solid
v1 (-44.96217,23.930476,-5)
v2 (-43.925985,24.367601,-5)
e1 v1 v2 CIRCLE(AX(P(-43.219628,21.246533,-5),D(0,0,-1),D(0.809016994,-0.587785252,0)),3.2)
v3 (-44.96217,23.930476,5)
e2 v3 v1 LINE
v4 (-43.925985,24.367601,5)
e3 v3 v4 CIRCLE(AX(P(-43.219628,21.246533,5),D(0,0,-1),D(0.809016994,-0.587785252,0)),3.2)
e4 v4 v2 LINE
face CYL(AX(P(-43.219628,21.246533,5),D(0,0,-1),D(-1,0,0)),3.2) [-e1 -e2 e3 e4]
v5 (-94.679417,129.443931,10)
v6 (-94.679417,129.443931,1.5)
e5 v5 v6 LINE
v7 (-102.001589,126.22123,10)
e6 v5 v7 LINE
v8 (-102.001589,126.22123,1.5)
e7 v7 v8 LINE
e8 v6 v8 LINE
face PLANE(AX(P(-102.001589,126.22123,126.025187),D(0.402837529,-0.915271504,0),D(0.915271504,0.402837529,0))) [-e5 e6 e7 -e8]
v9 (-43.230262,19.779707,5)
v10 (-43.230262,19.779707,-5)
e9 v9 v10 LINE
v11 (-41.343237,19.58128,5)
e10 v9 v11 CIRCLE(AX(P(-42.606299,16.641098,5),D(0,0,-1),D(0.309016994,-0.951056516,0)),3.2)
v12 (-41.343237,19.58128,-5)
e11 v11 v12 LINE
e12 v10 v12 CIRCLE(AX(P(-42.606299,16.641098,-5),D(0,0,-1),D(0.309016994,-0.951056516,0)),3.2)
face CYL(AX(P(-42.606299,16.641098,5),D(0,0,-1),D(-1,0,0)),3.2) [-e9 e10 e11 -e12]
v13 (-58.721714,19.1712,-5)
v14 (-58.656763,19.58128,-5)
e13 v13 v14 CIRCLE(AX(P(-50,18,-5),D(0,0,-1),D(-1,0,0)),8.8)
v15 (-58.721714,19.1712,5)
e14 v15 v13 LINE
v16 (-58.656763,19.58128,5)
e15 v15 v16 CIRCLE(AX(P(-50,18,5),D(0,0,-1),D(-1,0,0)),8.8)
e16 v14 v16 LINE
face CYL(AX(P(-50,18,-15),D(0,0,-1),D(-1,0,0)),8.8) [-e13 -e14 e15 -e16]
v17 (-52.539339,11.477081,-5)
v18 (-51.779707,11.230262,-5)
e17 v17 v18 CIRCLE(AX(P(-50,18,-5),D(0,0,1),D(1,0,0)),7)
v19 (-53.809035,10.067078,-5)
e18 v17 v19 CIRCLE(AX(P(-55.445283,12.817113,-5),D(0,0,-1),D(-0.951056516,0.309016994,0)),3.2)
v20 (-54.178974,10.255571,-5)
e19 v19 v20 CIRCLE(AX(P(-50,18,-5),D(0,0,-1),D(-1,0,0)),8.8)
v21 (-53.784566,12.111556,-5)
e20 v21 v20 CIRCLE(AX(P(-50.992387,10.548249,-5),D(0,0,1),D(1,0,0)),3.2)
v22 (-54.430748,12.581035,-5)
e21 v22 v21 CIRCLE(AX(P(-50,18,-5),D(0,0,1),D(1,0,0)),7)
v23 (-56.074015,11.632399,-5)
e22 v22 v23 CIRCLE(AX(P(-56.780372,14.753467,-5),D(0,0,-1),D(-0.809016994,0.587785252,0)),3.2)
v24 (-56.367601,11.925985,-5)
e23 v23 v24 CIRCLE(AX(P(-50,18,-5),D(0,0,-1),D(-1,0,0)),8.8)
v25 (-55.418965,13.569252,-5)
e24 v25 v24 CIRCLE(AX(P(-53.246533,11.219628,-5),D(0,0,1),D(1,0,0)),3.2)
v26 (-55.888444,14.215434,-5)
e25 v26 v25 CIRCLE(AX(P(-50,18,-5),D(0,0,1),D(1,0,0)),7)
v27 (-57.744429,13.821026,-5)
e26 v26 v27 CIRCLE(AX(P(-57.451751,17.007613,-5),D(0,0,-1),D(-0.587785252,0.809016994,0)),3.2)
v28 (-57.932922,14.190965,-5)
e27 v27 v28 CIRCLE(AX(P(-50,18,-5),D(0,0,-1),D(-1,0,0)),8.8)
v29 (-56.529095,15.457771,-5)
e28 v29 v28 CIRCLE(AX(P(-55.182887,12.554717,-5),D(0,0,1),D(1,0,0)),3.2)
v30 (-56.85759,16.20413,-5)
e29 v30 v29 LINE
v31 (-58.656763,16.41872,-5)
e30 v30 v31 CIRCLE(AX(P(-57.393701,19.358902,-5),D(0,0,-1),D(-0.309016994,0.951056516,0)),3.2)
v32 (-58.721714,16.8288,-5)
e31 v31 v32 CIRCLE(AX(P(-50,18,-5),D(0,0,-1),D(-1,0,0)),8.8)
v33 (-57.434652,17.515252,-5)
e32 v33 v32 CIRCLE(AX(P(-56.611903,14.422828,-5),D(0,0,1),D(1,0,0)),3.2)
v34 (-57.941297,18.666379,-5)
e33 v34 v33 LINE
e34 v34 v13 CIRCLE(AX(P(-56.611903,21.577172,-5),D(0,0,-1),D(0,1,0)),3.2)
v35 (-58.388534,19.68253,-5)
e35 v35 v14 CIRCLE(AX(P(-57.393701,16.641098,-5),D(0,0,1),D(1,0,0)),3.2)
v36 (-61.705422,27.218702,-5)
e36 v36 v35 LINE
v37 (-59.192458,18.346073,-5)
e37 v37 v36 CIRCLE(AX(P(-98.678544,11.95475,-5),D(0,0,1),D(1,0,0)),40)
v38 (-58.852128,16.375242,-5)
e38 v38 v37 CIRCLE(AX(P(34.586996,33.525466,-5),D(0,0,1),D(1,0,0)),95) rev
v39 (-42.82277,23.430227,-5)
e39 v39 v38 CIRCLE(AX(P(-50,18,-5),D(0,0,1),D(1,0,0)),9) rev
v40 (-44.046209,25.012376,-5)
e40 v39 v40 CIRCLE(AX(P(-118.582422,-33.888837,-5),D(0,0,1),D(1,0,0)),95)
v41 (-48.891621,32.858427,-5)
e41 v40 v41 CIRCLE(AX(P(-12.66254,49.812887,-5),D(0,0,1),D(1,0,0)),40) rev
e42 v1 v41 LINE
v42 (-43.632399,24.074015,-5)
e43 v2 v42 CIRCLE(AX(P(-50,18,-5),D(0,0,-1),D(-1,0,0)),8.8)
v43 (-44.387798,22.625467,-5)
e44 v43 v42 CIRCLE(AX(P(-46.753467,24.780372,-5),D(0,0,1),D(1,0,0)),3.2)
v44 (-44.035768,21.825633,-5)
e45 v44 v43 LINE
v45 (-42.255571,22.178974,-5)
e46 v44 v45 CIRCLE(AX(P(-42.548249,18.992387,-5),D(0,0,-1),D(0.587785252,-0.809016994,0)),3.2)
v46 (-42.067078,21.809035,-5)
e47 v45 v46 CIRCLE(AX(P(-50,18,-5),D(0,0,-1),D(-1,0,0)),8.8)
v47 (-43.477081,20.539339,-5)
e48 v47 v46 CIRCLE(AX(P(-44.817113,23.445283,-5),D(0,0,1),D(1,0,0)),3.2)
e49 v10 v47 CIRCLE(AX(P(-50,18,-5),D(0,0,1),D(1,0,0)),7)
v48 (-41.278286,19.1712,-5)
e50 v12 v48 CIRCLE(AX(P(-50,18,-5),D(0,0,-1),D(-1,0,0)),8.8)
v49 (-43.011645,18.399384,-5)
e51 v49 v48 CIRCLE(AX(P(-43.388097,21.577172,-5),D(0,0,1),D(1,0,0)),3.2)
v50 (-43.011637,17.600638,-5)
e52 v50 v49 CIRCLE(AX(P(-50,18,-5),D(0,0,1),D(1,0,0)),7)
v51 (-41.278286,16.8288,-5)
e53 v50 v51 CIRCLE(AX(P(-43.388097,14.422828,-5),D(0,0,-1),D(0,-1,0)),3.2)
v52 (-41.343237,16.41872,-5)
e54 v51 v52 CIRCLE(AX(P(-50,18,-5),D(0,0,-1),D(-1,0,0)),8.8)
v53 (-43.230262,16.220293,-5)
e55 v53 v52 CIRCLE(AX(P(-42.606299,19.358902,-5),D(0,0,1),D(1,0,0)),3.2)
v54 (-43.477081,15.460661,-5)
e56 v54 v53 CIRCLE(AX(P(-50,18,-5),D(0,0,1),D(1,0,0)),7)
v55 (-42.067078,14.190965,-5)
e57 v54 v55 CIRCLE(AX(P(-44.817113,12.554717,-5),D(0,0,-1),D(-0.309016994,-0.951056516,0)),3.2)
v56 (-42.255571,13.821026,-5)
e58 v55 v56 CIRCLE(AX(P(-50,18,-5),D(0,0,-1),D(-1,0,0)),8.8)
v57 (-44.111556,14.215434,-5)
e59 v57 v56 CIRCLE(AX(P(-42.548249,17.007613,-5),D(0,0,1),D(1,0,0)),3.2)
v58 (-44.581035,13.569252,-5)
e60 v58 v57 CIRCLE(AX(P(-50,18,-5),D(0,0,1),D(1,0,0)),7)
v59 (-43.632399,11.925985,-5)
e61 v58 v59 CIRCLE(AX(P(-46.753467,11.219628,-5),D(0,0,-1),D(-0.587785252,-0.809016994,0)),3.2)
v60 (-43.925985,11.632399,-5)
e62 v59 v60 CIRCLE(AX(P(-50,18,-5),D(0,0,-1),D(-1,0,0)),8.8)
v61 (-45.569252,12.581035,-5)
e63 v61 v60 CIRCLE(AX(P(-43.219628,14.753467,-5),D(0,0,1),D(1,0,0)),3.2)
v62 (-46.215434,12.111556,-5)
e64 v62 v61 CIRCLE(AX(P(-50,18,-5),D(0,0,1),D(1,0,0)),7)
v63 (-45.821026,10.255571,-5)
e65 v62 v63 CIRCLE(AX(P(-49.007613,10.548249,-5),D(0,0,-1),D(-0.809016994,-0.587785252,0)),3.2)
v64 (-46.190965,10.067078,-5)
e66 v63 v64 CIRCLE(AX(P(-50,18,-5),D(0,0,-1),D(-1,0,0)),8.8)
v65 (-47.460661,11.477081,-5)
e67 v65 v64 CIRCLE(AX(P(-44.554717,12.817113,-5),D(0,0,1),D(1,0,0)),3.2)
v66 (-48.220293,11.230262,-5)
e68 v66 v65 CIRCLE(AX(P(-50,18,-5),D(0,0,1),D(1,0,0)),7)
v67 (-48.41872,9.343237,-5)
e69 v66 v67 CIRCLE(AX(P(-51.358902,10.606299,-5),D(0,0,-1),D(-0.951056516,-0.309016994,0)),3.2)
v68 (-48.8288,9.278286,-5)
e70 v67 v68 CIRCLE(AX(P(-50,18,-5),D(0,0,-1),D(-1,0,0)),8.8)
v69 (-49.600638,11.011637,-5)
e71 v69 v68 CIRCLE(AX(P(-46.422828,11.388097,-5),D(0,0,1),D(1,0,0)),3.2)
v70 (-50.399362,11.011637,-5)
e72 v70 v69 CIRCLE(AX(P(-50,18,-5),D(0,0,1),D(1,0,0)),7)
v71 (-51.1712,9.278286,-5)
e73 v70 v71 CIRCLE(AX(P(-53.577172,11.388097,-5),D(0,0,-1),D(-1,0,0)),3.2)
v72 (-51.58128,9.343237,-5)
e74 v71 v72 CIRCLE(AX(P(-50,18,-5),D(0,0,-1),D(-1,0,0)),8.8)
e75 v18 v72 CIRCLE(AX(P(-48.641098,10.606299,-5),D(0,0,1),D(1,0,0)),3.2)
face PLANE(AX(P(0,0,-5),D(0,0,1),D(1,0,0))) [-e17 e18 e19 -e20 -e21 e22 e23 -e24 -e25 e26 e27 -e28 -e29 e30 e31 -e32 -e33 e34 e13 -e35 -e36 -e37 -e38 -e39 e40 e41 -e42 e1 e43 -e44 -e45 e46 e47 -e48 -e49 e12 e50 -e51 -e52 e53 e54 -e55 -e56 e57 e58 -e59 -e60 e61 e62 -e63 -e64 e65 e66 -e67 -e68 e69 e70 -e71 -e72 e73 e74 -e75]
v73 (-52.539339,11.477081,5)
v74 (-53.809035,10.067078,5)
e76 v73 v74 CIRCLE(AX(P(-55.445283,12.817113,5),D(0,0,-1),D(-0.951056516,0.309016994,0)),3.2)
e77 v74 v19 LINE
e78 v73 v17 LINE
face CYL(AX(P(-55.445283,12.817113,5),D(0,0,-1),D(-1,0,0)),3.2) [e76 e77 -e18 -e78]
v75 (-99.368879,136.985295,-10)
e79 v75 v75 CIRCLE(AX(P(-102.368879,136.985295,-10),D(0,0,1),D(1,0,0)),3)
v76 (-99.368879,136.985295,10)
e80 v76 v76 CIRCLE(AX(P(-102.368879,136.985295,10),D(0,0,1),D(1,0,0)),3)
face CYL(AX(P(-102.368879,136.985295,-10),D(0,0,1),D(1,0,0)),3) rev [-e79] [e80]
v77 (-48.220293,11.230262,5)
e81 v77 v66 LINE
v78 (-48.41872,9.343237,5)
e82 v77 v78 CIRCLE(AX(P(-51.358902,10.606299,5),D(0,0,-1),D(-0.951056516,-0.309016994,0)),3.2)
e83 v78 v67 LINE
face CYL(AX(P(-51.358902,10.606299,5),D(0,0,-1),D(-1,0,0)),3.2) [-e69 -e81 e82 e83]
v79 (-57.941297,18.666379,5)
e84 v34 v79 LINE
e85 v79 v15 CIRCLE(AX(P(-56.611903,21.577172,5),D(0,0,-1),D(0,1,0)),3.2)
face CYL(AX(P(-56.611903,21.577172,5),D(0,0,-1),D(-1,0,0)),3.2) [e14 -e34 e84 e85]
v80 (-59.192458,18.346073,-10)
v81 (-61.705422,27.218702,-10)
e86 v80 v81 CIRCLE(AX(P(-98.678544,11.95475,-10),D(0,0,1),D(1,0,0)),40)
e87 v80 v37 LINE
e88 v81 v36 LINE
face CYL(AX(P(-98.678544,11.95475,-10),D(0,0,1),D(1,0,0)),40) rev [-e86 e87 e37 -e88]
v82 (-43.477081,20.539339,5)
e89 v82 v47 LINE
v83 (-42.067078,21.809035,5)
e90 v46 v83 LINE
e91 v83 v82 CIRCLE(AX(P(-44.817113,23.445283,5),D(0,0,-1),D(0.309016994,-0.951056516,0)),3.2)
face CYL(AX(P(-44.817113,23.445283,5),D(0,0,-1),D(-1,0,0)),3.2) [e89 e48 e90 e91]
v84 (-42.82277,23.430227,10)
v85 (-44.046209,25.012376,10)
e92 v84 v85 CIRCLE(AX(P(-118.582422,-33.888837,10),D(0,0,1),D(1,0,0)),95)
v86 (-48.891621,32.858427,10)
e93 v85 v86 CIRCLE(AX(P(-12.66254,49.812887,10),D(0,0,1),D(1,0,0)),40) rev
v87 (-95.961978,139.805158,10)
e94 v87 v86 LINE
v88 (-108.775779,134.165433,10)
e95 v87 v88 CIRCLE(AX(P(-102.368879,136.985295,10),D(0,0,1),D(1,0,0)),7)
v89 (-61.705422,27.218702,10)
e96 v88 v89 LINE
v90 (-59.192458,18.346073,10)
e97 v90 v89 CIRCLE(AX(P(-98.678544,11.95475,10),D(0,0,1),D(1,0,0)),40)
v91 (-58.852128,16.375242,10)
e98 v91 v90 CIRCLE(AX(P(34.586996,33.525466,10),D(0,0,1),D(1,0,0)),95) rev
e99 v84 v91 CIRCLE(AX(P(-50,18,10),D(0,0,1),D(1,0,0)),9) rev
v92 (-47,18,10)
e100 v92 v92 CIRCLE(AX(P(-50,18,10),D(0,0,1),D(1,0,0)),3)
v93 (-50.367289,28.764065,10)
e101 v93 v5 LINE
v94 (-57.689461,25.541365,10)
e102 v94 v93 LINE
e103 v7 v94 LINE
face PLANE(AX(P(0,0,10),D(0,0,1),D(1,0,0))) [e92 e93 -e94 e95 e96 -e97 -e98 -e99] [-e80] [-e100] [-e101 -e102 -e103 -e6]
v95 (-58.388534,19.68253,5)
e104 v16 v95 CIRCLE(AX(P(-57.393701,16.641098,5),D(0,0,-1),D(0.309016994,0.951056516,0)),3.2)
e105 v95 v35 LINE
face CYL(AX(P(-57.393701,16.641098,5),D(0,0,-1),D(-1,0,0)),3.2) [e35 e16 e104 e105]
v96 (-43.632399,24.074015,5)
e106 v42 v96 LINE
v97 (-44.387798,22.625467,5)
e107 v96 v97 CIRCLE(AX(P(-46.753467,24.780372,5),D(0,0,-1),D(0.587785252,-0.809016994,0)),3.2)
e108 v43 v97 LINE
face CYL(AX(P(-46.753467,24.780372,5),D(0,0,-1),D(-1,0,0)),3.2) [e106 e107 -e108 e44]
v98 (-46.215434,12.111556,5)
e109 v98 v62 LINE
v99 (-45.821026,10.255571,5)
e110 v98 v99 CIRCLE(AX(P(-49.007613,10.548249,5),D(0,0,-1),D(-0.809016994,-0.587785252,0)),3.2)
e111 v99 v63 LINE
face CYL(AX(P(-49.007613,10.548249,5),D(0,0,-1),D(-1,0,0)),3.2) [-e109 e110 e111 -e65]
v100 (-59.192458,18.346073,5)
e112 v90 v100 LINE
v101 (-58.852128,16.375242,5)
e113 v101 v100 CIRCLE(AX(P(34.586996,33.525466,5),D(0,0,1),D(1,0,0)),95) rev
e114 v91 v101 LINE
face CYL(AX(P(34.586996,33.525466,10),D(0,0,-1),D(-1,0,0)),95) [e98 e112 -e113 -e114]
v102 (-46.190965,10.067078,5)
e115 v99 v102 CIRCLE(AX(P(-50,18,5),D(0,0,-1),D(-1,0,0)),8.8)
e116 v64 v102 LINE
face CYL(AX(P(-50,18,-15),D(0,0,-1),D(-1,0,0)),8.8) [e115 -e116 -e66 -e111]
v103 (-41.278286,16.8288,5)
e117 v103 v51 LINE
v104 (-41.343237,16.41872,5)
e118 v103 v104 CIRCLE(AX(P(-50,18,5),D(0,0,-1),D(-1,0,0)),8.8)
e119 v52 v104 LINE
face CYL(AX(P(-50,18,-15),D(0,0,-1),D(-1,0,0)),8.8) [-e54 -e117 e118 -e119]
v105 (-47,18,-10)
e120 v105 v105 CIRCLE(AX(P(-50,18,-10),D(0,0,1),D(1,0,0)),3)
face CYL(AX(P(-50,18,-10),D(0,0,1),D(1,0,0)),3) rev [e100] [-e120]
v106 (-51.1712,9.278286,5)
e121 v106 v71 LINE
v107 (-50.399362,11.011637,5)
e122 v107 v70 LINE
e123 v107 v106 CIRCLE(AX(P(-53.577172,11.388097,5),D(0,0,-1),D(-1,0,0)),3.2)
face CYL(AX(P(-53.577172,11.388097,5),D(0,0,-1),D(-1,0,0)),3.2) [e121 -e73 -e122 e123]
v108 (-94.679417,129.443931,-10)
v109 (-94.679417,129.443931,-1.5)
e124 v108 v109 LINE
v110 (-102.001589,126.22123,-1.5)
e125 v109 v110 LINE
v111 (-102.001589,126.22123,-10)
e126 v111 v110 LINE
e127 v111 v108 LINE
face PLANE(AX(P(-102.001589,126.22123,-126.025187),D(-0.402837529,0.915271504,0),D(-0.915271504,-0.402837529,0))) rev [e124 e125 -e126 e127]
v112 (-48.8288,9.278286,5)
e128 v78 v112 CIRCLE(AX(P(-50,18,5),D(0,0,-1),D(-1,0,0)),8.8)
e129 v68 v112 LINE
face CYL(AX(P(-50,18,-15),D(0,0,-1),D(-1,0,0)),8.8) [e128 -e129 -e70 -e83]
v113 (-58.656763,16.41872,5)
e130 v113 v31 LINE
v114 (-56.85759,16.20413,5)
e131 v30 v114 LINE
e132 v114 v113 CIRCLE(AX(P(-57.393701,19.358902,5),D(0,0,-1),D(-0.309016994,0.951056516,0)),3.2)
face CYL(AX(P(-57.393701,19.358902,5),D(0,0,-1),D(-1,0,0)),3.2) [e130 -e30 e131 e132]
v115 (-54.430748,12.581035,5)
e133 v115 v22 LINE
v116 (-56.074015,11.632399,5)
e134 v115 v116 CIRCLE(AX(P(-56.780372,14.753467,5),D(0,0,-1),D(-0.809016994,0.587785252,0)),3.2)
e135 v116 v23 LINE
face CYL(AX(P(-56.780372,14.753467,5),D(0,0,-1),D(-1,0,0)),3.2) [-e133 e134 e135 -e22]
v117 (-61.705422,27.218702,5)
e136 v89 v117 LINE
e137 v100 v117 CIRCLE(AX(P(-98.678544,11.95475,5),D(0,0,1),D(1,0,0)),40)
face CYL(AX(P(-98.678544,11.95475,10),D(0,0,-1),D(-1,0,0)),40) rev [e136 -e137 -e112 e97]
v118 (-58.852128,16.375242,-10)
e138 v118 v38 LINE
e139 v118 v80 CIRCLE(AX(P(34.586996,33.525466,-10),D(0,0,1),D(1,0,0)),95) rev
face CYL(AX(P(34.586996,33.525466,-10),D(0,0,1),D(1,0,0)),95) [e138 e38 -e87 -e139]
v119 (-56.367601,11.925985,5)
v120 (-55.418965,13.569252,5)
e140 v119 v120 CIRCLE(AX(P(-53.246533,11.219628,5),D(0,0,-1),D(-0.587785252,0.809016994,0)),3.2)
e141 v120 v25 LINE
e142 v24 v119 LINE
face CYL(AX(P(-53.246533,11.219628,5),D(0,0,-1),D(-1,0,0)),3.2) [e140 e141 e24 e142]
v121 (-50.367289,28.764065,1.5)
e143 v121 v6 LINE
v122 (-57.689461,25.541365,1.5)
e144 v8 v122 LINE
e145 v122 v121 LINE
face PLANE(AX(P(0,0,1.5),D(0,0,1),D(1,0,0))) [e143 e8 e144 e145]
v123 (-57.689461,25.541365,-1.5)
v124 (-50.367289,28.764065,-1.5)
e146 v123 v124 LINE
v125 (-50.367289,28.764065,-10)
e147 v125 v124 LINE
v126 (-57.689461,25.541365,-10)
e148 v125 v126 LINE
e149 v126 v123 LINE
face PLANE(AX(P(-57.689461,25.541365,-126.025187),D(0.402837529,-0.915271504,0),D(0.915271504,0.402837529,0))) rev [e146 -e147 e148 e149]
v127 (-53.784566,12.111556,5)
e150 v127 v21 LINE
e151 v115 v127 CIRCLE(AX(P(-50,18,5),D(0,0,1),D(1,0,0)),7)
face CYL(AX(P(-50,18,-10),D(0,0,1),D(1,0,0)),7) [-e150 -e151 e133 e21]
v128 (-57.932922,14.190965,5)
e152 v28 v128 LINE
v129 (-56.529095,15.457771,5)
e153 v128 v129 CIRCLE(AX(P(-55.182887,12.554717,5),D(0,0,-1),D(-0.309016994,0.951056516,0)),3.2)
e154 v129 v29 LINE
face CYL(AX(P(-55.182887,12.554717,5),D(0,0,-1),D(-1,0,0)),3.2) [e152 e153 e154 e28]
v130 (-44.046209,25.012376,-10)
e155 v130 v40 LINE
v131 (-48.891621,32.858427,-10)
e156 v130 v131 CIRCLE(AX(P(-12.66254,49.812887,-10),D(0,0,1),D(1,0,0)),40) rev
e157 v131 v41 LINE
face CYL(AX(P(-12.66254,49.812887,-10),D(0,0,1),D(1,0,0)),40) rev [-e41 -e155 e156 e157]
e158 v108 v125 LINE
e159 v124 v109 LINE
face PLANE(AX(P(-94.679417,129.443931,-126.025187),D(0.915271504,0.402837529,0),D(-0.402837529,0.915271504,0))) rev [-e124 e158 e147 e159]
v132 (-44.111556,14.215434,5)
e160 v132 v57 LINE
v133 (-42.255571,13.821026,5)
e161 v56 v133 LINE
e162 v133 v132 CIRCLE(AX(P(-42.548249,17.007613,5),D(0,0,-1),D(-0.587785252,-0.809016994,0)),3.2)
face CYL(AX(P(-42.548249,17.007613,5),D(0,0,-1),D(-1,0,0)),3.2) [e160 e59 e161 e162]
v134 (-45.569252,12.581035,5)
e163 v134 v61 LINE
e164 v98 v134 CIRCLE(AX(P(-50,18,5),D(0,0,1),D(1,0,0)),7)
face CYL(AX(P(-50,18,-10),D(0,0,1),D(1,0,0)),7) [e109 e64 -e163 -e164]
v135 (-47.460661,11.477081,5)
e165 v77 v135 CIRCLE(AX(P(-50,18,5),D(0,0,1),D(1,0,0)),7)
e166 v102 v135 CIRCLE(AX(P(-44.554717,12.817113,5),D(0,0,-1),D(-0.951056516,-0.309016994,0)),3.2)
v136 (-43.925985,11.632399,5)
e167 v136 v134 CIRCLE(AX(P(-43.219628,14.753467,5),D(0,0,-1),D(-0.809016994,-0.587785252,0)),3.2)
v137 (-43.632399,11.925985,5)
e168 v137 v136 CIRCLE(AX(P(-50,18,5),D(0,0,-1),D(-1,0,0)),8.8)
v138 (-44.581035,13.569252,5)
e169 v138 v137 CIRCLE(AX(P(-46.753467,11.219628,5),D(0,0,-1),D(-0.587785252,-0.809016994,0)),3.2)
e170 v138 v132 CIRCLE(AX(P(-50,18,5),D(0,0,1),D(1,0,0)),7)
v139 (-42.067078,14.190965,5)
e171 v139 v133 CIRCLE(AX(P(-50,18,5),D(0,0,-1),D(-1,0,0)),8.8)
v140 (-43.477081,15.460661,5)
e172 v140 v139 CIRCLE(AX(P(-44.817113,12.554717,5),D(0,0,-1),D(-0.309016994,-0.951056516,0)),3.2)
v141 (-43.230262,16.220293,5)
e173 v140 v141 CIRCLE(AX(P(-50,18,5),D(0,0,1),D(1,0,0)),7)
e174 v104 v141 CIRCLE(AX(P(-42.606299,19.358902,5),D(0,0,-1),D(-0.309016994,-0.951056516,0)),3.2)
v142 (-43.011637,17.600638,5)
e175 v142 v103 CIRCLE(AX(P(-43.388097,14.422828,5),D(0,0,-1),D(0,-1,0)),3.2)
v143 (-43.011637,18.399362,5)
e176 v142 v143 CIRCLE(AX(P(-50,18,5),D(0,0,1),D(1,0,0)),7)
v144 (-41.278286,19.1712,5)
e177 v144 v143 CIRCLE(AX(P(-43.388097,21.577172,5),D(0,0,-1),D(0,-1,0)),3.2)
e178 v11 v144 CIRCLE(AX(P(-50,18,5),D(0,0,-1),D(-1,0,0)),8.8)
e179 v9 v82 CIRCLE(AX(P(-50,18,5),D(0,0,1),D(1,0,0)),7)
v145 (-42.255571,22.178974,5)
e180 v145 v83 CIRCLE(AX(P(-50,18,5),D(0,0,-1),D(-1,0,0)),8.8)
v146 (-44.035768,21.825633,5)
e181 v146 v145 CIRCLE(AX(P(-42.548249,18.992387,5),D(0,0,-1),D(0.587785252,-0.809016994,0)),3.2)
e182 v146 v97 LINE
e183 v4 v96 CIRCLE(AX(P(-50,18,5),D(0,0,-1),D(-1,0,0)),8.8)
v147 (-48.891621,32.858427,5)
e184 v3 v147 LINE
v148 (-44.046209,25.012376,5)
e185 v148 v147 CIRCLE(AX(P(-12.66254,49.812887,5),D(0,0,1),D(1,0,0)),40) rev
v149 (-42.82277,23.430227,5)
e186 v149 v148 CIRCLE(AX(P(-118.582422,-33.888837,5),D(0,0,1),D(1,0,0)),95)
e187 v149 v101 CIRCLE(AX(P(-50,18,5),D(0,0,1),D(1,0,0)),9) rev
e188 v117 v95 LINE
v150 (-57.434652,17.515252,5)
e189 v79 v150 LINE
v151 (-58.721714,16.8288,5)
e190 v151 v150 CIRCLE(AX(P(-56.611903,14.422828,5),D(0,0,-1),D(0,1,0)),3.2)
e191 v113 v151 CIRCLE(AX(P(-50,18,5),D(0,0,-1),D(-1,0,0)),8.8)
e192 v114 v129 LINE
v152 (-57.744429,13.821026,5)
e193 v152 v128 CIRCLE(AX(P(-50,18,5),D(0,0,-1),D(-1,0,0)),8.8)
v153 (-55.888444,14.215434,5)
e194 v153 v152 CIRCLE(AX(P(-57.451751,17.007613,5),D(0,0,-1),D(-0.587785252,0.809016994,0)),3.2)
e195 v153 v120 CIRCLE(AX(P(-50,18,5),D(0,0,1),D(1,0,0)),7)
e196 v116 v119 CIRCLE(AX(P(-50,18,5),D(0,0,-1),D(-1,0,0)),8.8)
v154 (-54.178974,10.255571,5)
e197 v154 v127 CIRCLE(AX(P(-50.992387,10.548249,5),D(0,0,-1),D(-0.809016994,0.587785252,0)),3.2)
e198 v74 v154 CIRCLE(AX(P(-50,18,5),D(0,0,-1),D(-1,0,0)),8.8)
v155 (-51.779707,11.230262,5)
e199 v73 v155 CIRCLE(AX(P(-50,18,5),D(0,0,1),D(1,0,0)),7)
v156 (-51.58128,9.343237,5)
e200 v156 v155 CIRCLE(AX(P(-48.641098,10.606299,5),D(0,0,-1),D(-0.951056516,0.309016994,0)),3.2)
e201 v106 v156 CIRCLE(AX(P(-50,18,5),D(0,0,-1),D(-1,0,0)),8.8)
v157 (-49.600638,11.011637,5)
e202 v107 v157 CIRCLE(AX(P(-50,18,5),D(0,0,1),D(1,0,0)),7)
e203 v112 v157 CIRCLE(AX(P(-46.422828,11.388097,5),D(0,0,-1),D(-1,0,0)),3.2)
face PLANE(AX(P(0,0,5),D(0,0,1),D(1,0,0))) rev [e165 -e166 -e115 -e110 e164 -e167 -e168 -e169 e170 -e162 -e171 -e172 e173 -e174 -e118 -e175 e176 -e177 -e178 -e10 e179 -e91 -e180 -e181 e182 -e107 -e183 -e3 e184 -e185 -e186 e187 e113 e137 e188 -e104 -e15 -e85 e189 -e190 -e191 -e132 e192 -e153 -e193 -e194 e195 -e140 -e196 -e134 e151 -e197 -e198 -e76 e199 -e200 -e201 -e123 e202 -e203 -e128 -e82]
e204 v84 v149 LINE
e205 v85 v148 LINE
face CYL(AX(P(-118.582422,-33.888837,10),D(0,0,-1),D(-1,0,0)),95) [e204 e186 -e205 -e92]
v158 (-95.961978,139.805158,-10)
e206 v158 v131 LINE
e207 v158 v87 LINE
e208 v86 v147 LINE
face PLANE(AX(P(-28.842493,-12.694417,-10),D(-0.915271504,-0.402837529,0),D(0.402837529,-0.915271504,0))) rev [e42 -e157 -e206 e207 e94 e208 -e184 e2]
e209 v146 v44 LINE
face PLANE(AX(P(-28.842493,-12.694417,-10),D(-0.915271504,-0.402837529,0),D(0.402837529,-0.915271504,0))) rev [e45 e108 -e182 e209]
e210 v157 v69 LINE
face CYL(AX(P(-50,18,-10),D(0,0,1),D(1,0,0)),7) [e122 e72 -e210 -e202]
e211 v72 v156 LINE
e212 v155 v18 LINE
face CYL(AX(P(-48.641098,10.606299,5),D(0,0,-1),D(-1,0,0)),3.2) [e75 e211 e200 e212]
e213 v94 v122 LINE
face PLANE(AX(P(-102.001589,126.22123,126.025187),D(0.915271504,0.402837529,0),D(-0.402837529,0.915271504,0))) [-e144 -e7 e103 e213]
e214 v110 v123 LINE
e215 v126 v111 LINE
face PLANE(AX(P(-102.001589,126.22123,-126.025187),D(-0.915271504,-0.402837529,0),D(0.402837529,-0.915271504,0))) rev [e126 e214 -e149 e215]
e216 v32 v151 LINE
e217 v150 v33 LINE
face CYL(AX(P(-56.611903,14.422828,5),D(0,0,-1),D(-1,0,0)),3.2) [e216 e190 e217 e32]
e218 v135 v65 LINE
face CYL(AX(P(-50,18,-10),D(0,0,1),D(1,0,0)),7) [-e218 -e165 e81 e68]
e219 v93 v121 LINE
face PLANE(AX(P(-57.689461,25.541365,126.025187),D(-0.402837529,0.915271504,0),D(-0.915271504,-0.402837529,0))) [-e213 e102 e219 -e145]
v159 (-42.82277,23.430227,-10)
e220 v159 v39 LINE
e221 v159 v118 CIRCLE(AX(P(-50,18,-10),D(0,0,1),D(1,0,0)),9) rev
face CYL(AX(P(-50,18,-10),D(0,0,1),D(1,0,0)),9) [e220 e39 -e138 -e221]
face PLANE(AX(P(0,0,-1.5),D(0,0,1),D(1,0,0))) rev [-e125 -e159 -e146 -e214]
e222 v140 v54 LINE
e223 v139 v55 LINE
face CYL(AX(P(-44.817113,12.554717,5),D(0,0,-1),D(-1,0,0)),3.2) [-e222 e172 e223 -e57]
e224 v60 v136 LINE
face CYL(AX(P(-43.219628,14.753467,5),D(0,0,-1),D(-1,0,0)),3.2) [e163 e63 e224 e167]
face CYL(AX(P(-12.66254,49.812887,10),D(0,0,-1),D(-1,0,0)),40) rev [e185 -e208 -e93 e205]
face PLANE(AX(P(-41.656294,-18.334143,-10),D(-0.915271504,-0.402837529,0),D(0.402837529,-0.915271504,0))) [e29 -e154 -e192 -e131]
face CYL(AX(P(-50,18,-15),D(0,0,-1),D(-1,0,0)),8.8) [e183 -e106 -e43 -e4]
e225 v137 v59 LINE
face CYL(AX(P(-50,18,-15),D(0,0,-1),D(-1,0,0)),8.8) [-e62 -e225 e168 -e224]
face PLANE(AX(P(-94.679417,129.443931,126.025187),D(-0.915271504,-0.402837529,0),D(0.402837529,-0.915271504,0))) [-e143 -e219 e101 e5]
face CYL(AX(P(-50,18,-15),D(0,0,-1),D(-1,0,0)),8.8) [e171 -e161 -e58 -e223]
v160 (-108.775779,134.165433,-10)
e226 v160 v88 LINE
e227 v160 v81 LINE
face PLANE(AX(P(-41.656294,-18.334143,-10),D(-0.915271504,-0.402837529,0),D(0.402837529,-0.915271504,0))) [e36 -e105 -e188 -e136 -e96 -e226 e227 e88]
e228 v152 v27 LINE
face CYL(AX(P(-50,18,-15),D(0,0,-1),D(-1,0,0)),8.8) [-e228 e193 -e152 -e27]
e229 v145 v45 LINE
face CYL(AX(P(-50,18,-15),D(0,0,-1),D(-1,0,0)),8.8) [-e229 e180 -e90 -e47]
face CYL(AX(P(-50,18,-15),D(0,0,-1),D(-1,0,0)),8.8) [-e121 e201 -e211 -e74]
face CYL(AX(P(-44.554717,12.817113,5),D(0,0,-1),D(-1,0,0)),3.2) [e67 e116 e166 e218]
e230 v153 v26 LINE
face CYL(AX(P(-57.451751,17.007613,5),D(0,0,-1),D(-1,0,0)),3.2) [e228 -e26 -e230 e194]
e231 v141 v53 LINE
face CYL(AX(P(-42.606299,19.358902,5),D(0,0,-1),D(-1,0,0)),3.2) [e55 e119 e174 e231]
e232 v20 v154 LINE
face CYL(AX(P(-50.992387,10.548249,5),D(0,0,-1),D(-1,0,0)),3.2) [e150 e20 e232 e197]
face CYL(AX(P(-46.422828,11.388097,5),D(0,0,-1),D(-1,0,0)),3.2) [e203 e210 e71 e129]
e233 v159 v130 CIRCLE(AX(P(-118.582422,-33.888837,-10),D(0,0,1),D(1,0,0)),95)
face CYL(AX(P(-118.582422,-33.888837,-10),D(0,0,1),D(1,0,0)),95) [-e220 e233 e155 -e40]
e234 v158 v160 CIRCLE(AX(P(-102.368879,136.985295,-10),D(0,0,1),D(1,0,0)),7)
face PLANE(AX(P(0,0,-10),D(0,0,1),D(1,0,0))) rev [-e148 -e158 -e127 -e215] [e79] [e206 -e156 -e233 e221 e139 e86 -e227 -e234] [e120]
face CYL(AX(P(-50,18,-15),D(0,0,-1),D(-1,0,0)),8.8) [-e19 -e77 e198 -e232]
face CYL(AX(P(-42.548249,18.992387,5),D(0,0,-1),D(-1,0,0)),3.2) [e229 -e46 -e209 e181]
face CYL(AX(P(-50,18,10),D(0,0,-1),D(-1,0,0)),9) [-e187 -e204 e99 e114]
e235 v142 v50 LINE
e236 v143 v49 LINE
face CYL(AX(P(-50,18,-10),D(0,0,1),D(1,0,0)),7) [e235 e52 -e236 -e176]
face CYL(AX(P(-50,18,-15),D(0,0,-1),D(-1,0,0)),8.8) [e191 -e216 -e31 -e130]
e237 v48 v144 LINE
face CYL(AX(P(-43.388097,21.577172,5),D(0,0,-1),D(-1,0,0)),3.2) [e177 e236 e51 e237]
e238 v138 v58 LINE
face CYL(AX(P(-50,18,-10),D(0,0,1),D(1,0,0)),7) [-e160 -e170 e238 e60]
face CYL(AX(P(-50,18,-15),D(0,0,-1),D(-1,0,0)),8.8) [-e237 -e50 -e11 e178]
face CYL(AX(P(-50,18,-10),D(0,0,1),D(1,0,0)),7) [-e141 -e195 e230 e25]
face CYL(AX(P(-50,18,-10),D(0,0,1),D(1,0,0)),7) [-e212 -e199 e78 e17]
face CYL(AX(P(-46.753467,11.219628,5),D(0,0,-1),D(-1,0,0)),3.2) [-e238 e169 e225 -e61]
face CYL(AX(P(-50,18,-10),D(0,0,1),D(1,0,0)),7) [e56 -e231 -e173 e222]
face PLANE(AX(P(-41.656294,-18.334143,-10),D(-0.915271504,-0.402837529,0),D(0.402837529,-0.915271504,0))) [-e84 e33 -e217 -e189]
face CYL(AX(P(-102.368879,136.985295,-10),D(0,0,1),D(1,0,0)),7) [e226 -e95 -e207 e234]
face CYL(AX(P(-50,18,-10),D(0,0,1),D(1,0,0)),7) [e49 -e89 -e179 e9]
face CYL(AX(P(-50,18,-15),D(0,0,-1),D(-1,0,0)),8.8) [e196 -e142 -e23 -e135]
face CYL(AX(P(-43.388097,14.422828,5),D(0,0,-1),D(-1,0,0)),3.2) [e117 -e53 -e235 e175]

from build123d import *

# Parameters (mm, degrees)
BOSS_EXTRUDE1_DEPTH                       = 10
BOSS_EXTRUDE1_DEPTH_BACK                  = 10
SKETCH1_R                                 = 3
CUT_EXTRUDE1_START                        = -1.5
CUT_EXTRUDE1_DEPTH                        = 8.5
CUT_EXTRUDE2_START                        = 1.5
CUT_EXTRUDE2_DEPTH                        = 8.5
ISO_START                                 = -65.353403805
ISO_SPUR_GEAR_0_8M_20T_20PA_10FW_2_R      = 3
ISO_SPUR_GEAR_0_8M_20T_20PA_10FW_S2_DEPTH = 10
BODY_MOVE_COPY5_ANGLE                     = 90
BOSS_EXTRUDE3_START                       = 5
BOSS_EXTRUDE3_DEPTH                       = 5
BOSS_EXTRUDE4_START                       = -10
BOSS_EXTRUDE4_DEPTH                       = 5


with BuildPart() as part:
    # Sketch1 → Boss-Extrude1 (new, two sides: drawn at the far end of the back side and taken through both)
    with BuildSketch(Plane.XY.offset(-BOSS_EXTRUDE1_DEPTH_BACK)):
        with BuildLine():
            Line((-43.593099474, 20.819862701), (-95.961978206, 139.805158181))
            ThreePointArc((-95.961978206, 139.805158181), (-105.188741432, 143.392196006), (-108.775779257, 134.165432779))
            Line((-108.775779257, 134.165432779), (-56.406900526, 15.180137299))
            ThreePointArc((-56.406900526, 15.180137299), (-47.180137299, 11.593099474), (-43.593099474, 20.819862701))
        make_face()
        with Locations((-102.368878731, 136.98529548)):
            Circle(SKETCH1_R, mode=Mode.SUBTRACT)
        with Locations((-50, 18)):
            Circle(SKETCH1_R, mode=Mode.SUBTRACT)
    extrude(amount=BOSS_EXTRUDE1_DEPTH + BOSS_EXTRUDE1_DEPTH_BACK)

    # Sketch3 → Cut-Extrude1 (cut)
    with BuildSketch(Plane.XY.offset(CUT_EXTRUDE1_START)):
        Polygon((-102.001589459, 126.221230328), (-94.67941743, 129.443930558), (-50.367289272, 28.764065152), (-57.689461302, 25.541364922), align=None)
    extrude(amount=-CUT_EXTRUDE1_DEPTH, mode=Mode.SUBTRACT)

    # Sketch3<2> → Cut-Extrude2 (cut)
    with BuildSketch(Plane.XY.offset(CUT_EXTRUDE2_START)):
        Polygon((-102.001589459, 126.221230328), (-94.67941743, 129.443930558), (-50.367289272, 28.764065152), (-57.689461302, 25.541364922), align=None)
    extrude(amount=CUT_EXTRUDE2_DEPTH, mode=Mode.SUBTRACT)


with BuildPart() as body_2:
    # ISO - Spur gear 0.8M 20T 20PA 10FW ---S2: read off the stored shape, not the designer's step
    # ISO - Spur gear 0.8M 20T 20PA 10FW - 2 → ISO - Spur gear 0.8M 20T 20PA 10FW ---S2 (new body)
    with BuildSketch(Plane.YZ.offset(ISO_START)):
        with BuildLine():
            ThreePointArc((13.061118754, 13.065363156), (12.856461697, 13.100257159), (12.65103843, 13.130313498))
            ThreePointArc((12.65103843, 13.130313498), (12.133552117, 12.321807494), (11.879141065, 11.396200093))
            ThreePointArc((11.879141065, 11.396200093), (11.479838405, 11.407599762), (11.080535745, 11.396200093))
            ThreePointArc((11.080535745, 11.396200093), (10.826124693, 12.321807494), (10.30863838, 13.130313498))
            ThreePointArc((10.30863838, 13.130313498), (10.103215113, 13.100257159), (9.898558056, 13.065363156))
            ThreePointArc((9.898558056, 13.065363156), (9.656241422, 12.136516187), (9.70031055, 11.177593898))
            ThreePointArc((9.70031055, 11.177593898), (9.317028462, 11.065044319), (8.940791756, 10.930811282))
            ThreePointArc((8.940791756, 10.930811282), (8.41280405, 11.732498893), (7.670803225, 12.341521733))
            ThreePointArc((7.670803225, 12.341521733), (7.484722007, 12.249457175), (7.30086442, 12.153028497))
            ThreePointArc((7.30086442, 12.153028497), (7.357437105, 11.194762576), (7.695672619, 10.296391394))
            ThreePointArc((7.695672619, 10.296391394), (7.365929424, 10.070909706), (7.049587344, 9.826982965))
            ThreePointArc((7.049587344, 9.826982965), (6.299706099, 10.426276017), (5.405822972, 10.776200293))
            ThreePointArc((5.405822972, 10.776200293), (5.257298731, 10.631139436), (5.112237874, 10.482615195))
            ThreePointArc((5.112237874, 10.482615195), (5.46216215, 9.588732068), (6.061455202, 8.838850823))
            ThreePointArc((6.061455202, 8.838850823), (5.817528461, 8.522508743), (5.592046773, 8.192765548))
            ThreePointArc((5.592046773, 8.192765548), (4.693675591, 8.531001062), (3.73540967, 8.587573747))
            ThreePointArc((3.73540967, 8.587573747), (3.638980992, 8.40371616), (3.546916434, 8.217634942))
            ThreePointArc((3.546916434, 8.217634942), (4.155939274, 7.475634117), (4.957626885, 6.947646411))
            ThreePointArc((4.957626885, 6.947646411), (4.823393847, 6.571409706), (4.710844269, 6.188127617))
            ThreePointArc((4.710844269, 6.188127617), (3.75192198, 6.232196745), (2.823075011, 5.989880111))
            ThreePointArc((2.823075011, 5.989880111), (2.788181008, 5.785223054), (2.758124669, 5.579799787))
            ThreePointArc((2.758124669, 5.579799787), (3.566630673, 5.062313474), (4.492238074, 4.807902422))
            ThreePointArc((4.492238074, 4.807902422), (4.480838405, 4.408599762), (4.492238074, 4.009297102))
            ThreePointArc((4.492238074, 4.009297102), (3.566630673, 3.75488605), (2.758124669, 3.237399737))
            ThreePointArc((2.758124669, 3.237399737), (2.788181008, 3.03197647), (2.823075011, 2.827319413))
            ThreePointArc((2.823075011, 2.827319413), (3.75192198, 2.585002779), (4.710844269, 2.629071907))
            ThreePointArc((4.710844269, 2.629071907), (4.823393847, 2.245789818), (4.957626885, 1.869553113))
            ThreePointArc((4.957626885, 1.869553113), (4.155939274, 1.341565407), (3.546916434, 0.599564582))
            ThreePointArc((3.546916434, 0.599564582), (3.638980992, 0.413483364), (3.73540967, 0.229625777))
            ThreePointArc((3.73540967, 0.229625777), (4.693675591, 0.286198462), (5.592046773, 0.624433976))
            ThreePointArc((5.592046773, 0.624433976), (5.817528461, 0.294690781), (6.061455202, -0.021651299))
            ThreePointArc((6.061455202, -0.021651299), (5.46216215, -0.771532544), (5.112237874, -1.665415671))
            ThreePointArc((5.112237874, -1.665415671), (5.257298731, -1.813939912), (5.405822972, -1.959000769))
            ThreePointArc((5.405822972, -1.959000769), (6.299706099, -1.609076494), (7.049587344, -1.009783441))
            ThreePointArc((7.049587344, -1.009783441), (7.365929424, -1.253710182), (7.695672619, -1.479191871))
            ThreePointArc((7.695672619, -1.479191871), (7.357437105, -2.377563053), (7.30086442, -3.335828973))
            ThreePointArc((7.30086442, -3.335828973), (7.484722007, -3.432257651), (7.670803225, -3.524322209))
            ThreePointArc((7.670803225, -3.524322209), (8.41280405, -2.915299369), (8.940791756, -2.113611758))
            ThreePointArc((8.940791756, -2.113611758), (9.317028461, -2.247844796), (9.70031055, -2.360394374))
            ThreePointArc((9.70031055, -2.360394374), (9.656241422, -3.319316663), (9.898558056, -4.248163632))
            ThreePointArc((9.898558056, -4.248163632), (10.103215113, -4.283057635), (10.30863838, -4.313113975))
            ThreePointArc((10.30863838, -4.313113975), (10.826124693, -3.50460797), (11.080535745, -2.579000569))
            ThreePointArc((11.080535745, -2.579000569), (11.479838405, -2.590400238), (11.879141065, -2.579000569))
            ThreePointArc((11.879141065, -2.579000569), (12.133552117, -3.50460797), (12.65103843, -4.313113975))
            ThreePointArc((12.65103843, -4.313113975), (12.856461697, -4.283057635), (13.061118754, -4.248163632))
            ThreePointArc((13.061118754, -4.248163632), (13.303435388, -3.319316663), (13.25936626, -2.360394374))
            ThreePointArc((13.25936626, -2.360394374), (13.642648349, -2.247844796), (14.018885054, -2.113611758))
            ThreePointArc((14.018885054, -2.113611758), (14.54687276, -2.915299369), (15.288873585, -3.524322209))
            ThreePointArc((15.288873585, -3.524322209), (15.474954803, -3.432257651), (15.65881239, -3.335828973))
            ThreePointArc((15.65881239, -3.335828973), (15.602239705, -2.377563053), (15.264004191, -1.479191871))
            ThreePointArc((15.264004191, -1.479191871), (15.593747386, -1.253710182), (15.910089466, -1.009783441))
            ThreePointArc((15.910089466, -1.009783441), (16.659970711, -1.609076494), (17.553853838, -1.959000769))
            ThreePointArc((17.553853838, -1.959000769), (17.702378079, -1.813939912), (17.847438936, -1.665415671))
            ThreePointArc((17.847438936, -1.665415671), (17.49751466, -0.771532544), (16.898221608, -0.021651299))
            ThreePointArc((16.898221608, -0.021651299), (17.142148349, 0.294690781), (17.367630037, 0.624433976))
            ThreePointArc((17.367630037, 0.624433976), (18.266001219, 0.286198462), (19.22426714, 0.229625777))
            ThreePointArc((19.22426714, 0.229625777), (19.320695818, 0.413483364), (19.412760376, 0.599564582))
            ThreePointArc((19.412760376, 0.599564582), (18.803737536, 1.341565407), (18.002049925, 1.869553113))
            ThreePointArc((18.002049925, 1.869553113), (18.136282963, 2.245789818), (18.248832541, 2.629071907))
            ThreePointArc((18.248832541, 2.629071907), (19.20775483, 2.585002779), (20.136601799, 2.827319413))
            ThreePointArc((20.136601799, 2.827319413), (20.171495802, 3.03197647), (20.201552142, 3.237399737))
            ThreePointArc((20.201552142, 3.237399737), (19.393046137, 3.75488605), (18.467438736, 4.009297102))
            ThreePointArc((18.467438736, 4.009297102), (18.478838405, 4.408599762), (18.467438736, 4.807902422))
            ThreePointArc((18.467438736, 4.807902422), (19.393046137, 5.062313474), (20.201552142, 5.579799787))
            ThreePointArc((20.201552142, 5.579799787), (20.171495802, 5.785223054), (20.136601799, 5.989880111))
            ThreePointArc((20.136601799, 5.989880111), (19.20775483, 6.232196745), (18.248832541, 6.188127617))
            ThreePointArc((18.248832541, 6.188127617), (18.136282963, 6.571409706), (18.002049925, 6.947646411))
            ThreePointArc((18.002049925, 6.947646411), (18.803737536, 7.475634117), (19.412760376, 8.217634942))
            ThreePointArc((19.412760376, 8.217634942), (19.320695818, 8.40371616), (19.22426714, 8.587573747))
            ThreePointArc((19.22426714, 8.587573747), (18.266001219, 8.531001062), (17.367630037, 8.192765548))
            ThreePointArc((17.367630037, 8.192765548), (17.142148349, 8.522508743), (16.898221608, 8.838850823))
            ThreePointArc((16.898221608, 8.838850823), (17.49751466, 9.588732068), (17.847438936, 10.482615195))
            ThreePointArc((17.847438936, 10.482615195), (17.702378079, 10.631139436), (17.553853838, 10.776200293))
            ThreePointArc((17.553853838, 10.776200293), (16.659970711, 10.426276017), (15.910089466, 9.826982965))
            ThreePointArc((15.910089466, 9.826982965), (15.593747386, 10.070909706), (15.264004191, 10.296391394))
            ThreePointArc((15.264004191, 10.296391394), (15.602239705, 11.194762576), (15.65881239, 12.153028497))
            ThreePointArc((15.65881239, 12.153028497), (15.474954803, 12.249457175), (15.288873585, 12.341521733))
            ThreePointArc((15.288873585, 12.341521733), (14.54687276, 11.732498893), (14.018885054, 10.930811282))
            ThreePointArc((14.018885054, 10.930811282), (13.642648348, 11.065044319), (13.25936626, 11.177593898))
            ThreePointArc((13.25936626, 11.177593898), (13.303435388, 12.136516187), (13.061118754, 13.065363156))
        make_face()
        with Locations((11.479838405, 4.408599762)):
            Circle(ISO_SPUR_GEAR_0_8M_20T_20PA_10FW_2_R, mode=Mode.SUBTRACT)
    extrude(amount=ISO_SPUR_GEAR_0_8M_20T_20PA_10FW_S2_DEPTH)


with BuildPart() as body_2_1:
    # Body-Move/Copy5: read off the stored shape, not the designer's step
    # Body-Move/Copy5: moved
    add(body_2.part.moved(Location((60.3534038, 6.5201616, 45.5914002))).rotate(Axis((0, 0, 0), (0, -1, 0)), BODY_MOVE_COPY5_ANGLE))


with BuildPart() as part_1:
    add(part.part)

    # Combine1: union body 2
    add(body_2_1.part)

    # Sketch12 → Boss-Extrude3 (add)
    with BuildSketch(Plane.XY.offset(BOSS_EXTRUDE3_START)):
        with BuildLine():
            Line((-48.891620836, 32.858427304), (-43.593099474, 20.819862701))
            ThreePointArc((-43.593099474, 20.819862701), (-47.180137299, 11.593099474), (-56.406900526, 15.180137299))
            Line((-56.406900526, 15.180137299), (-61.705421887, 27.218701903))
            ThreePointArc((-61.705421887, 27.218701903), (-60.19239704, 22.855047235), (-59.192458109, 18.34607303))
            ThreePointArc((-59.192458109, 18.34607303), (-59.027479347, 17.359761867), (-58.852127503, 16.375241967))
            ThreePointArc((-58.852127503, 16.375241967), (-46.374462242, 9.762556467), (-42.82276978, 23.430227101))
            ThreePointArc((-42.82276978, 23.430227101), (-43.430325673, 24.224521466), (-44.0462089, 25.012376499))
            ThreePointArc((-44.0462089, 25.012376499), (-46.695775375, 28.795301788), (-48.891620836, 32.858427304))
        make_face()
    extrude(amount=BOSS_EXTRUDE3_DEPTH)

    # Sketch12<9> → Boss-Extrude4 (add)
    with BuildSketch(Plane.XY.offset(BOSS_EXTRUDE4_START)):
        with BuildLine():
            Line((-48.891620836, 32.858427304), (-43.593099474, 20.819862701))
            ThreePointArc((-43.593099474, 20.819862701), (-47.180137299, 11.593099474), (-56.406900526, 15.180137299))
            Line((-56.406900526, 15.180137299), (-61.705421887, 27.218701903))
            ThreePointArc((-61.705421887, 27.218701903), (-60.19239704, 22.855047235), (-59.192458109, 18.34607303))
            ThreePointArc((-59.192458109, 18.34607303), (-59.027479347, 17.359761867), (-58.852127503, 16.375241967))
            ThreePointArc((-58.852127503, 16.375241967), (-46.374462242, 9.762556467), (-42.82276978, 23.430227101))
            ThreePointArc((-42.82276978, 23.430227101), (-43.430325673, 24.224521466), (-44.0462089, 25.012376499))
            ThreePointArc((-44.0462089, 25.012376499), (-46.695775375, 28.795301788), (-48.891620836, 32.858427304))
        make_face()
    extrude(amount=BOSS_EXTRUDE4_DEPTH)


solid = part_1.part
